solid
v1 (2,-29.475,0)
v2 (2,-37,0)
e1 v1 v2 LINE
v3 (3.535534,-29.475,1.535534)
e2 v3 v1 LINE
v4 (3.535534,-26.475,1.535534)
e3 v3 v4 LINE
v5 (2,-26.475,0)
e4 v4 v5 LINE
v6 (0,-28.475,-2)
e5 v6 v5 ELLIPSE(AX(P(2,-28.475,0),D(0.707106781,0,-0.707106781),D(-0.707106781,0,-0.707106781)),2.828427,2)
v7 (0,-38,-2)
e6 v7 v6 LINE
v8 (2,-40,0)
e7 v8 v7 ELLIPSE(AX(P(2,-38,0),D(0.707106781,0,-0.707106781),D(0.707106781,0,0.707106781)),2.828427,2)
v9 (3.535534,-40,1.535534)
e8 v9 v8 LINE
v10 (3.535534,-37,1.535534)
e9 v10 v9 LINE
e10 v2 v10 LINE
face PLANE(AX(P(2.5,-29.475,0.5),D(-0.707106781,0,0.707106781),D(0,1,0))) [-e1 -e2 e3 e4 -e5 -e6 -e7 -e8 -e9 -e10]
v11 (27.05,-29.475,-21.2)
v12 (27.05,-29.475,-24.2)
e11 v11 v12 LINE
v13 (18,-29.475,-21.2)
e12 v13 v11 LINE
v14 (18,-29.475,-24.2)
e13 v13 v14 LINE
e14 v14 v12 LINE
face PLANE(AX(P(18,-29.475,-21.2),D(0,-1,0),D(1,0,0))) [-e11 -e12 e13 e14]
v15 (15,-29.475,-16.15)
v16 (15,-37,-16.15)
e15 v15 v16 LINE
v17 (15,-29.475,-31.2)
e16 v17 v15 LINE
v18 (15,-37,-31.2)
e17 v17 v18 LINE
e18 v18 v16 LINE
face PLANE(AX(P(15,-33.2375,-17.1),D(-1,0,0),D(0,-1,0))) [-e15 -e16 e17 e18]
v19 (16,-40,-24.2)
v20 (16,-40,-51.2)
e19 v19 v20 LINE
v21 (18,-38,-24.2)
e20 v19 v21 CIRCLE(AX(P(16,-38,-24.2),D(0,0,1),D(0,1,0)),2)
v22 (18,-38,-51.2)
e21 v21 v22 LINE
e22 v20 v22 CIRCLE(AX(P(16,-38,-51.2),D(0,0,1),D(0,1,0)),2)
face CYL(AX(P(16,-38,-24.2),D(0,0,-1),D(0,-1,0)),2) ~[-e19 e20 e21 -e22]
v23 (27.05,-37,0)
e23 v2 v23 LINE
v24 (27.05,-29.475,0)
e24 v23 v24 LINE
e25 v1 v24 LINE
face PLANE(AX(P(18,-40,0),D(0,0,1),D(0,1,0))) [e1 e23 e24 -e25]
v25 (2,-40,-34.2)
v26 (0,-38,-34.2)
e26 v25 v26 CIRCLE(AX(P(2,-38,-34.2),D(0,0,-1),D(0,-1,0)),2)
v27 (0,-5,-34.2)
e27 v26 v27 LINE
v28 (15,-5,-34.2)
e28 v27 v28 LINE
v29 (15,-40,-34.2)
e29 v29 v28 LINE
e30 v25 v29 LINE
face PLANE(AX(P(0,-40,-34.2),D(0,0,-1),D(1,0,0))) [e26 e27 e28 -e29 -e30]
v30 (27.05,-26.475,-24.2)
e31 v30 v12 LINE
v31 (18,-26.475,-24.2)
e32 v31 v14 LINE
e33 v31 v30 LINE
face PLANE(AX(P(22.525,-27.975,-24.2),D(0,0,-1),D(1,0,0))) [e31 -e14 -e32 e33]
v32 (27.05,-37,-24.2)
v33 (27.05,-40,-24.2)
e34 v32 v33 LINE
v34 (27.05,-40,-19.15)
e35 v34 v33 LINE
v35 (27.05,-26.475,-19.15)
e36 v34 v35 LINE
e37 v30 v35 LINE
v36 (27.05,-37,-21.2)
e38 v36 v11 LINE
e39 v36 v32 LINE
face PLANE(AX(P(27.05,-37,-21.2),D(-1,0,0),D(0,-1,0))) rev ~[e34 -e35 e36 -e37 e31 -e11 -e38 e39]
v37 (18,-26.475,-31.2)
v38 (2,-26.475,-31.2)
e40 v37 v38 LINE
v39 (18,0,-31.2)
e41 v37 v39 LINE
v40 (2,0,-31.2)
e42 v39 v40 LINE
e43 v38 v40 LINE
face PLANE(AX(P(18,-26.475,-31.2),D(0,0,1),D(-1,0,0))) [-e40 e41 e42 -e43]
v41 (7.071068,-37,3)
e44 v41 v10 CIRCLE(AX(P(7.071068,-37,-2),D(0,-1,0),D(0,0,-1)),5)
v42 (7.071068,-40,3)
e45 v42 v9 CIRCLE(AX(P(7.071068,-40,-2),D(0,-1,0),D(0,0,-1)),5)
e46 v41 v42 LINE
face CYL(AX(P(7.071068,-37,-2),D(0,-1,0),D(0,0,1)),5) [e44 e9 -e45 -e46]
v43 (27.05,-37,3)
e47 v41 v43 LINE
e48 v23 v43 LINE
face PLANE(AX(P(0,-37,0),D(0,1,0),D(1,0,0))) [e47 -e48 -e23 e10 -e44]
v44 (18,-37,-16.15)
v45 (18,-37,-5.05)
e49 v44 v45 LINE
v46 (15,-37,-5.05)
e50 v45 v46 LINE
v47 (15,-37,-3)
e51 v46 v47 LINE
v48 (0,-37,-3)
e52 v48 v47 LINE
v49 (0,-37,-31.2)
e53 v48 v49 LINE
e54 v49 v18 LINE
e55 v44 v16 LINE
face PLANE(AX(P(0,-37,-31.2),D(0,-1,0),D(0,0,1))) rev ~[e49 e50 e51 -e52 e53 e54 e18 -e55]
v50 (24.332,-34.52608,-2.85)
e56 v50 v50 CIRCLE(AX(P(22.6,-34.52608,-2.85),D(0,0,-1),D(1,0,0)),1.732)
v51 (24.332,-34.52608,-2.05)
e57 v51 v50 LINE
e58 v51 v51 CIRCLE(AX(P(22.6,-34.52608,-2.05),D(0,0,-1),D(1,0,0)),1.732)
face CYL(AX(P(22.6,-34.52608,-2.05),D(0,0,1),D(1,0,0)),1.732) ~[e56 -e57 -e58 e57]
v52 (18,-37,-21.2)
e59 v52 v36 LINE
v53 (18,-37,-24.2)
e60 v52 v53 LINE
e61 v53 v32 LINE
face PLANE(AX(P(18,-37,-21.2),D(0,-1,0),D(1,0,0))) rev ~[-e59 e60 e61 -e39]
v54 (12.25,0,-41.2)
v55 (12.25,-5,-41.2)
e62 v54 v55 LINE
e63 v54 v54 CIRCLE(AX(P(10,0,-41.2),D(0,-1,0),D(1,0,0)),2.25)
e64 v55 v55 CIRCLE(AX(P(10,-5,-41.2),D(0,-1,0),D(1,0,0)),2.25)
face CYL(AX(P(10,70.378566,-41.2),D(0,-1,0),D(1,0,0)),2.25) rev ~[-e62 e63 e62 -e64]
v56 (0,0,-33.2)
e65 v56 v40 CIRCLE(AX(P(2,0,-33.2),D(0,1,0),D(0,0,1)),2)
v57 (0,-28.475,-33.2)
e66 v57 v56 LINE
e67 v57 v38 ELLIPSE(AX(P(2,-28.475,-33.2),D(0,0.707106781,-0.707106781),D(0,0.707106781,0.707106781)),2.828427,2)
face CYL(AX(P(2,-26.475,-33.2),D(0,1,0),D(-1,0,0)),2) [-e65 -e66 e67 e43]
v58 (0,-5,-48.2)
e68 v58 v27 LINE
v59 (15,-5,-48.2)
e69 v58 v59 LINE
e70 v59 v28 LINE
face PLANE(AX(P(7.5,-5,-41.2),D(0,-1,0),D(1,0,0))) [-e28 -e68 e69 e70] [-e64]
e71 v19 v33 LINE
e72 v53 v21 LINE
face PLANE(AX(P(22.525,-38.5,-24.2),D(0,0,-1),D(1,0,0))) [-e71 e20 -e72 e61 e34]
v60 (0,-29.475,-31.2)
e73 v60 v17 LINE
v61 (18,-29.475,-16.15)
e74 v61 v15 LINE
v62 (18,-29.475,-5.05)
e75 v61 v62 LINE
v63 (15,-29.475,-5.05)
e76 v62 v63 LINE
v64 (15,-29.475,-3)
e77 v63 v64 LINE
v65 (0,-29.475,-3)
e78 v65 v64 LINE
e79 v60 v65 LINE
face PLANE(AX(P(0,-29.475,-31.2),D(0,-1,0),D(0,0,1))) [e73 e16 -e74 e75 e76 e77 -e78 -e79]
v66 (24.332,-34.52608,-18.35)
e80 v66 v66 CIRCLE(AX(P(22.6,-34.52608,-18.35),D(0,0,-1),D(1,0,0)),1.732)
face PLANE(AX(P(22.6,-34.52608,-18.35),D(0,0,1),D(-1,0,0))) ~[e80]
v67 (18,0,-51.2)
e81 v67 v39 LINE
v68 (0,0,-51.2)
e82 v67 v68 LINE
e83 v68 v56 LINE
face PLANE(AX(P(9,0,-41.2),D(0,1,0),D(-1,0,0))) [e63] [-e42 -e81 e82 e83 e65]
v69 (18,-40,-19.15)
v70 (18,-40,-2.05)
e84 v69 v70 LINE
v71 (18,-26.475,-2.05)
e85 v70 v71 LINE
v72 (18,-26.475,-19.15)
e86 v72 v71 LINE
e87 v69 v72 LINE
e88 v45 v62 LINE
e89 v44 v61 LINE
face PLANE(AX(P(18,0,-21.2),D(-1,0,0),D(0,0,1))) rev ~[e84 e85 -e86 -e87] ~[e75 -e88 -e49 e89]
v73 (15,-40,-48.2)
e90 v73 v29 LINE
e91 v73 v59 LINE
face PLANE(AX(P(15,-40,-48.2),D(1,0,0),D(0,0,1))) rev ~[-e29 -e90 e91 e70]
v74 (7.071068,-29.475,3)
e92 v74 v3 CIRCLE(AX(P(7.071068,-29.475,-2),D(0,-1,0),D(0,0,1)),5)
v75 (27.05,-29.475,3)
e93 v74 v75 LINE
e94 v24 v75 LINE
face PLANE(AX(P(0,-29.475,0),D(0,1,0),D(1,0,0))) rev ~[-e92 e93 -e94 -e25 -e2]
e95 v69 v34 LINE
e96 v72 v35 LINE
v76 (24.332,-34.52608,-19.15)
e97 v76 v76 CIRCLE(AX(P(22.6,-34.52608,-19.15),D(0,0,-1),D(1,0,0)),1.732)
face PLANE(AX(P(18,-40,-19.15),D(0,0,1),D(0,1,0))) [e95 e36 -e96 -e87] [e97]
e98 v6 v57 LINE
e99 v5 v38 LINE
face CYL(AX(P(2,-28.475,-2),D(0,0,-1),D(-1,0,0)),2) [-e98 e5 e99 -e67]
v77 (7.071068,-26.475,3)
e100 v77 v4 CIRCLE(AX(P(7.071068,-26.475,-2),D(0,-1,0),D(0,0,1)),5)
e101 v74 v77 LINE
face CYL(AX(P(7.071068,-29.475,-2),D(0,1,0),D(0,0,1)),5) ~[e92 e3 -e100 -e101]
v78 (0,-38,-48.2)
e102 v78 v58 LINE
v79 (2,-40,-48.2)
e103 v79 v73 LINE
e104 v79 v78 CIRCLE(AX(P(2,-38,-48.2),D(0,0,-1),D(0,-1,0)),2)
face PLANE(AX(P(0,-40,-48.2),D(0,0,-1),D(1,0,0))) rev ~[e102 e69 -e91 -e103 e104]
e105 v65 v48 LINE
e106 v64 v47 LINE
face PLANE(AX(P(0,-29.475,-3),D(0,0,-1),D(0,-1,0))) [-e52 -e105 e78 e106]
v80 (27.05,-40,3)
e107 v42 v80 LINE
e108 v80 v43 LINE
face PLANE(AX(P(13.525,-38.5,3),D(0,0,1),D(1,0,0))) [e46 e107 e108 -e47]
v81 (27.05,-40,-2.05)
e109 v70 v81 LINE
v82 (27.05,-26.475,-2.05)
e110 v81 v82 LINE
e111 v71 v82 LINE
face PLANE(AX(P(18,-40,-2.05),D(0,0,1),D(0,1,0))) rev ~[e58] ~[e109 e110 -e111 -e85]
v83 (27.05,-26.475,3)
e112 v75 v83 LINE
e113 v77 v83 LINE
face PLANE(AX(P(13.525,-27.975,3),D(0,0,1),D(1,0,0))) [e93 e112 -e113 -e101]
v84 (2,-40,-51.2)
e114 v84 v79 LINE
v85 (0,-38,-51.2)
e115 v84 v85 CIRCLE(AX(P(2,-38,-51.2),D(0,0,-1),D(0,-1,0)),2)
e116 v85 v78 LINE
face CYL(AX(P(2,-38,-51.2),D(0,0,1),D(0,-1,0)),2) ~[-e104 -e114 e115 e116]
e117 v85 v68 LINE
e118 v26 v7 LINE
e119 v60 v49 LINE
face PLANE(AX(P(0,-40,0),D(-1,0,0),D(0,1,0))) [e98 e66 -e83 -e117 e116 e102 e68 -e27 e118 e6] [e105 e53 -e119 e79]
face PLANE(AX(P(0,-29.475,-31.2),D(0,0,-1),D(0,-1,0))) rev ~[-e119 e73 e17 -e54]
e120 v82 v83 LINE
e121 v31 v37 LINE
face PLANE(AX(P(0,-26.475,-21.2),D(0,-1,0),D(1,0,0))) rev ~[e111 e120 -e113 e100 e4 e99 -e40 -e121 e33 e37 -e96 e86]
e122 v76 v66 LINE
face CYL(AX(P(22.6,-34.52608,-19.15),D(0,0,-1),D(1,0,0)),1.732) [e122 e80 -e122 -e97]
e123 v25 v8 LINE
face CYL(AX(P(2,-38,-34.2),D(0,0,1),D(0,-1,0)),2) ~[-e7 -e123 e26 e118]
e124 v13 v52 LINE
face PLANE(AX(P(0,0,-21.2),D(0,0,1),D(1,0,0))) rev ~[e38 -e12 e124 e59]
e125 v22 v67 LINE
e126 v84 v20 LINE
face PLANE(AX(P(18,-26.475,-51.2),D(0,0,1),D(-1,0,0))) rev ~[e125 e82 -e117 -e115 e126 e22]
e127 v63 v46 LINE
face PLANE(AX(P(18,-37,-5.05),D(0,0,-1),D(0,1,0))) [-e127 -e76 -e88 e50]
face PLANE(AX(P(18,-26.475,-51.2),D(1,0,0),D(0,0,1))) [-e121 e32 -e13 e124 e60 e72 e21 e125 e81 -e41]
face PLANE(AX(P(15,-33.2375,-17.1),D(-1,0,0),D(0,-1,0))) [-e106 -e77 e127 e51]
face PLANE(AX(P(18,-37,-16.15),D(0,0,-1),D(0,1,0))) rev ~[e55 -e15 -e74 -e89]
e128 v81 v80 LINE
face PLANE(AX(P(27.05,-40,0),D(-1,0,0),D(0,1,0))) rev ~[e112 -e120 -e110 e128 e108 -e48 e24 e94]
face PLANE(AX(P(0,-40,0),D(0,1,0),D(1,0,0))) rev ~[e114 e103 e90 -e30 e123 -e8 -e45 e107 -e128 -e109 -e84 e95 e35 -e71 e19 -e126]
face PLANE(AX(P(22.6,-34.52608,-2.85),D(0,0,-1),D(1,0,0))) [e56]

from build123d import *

# Parameters (mm, degrees)
F0_W      = 18
F0_H      = 21.2
F1_DEPTH  = 40
F2_W      = 13.525
F2_H      = 2.05
F3_DEPTH  = 9.05
F4_R      = 1.732
F5_DEPTH  = 0.8
F7_W      = 18
F7_H      = 13.525
F8_DEPTH  = 30
F9_W      = 18
F9_H      = 20
F10_DEPTH = 26.475
F11_W     = 18
F11_H     = 26.475
F12_DEPTH = 21.2
F13_W     = 15
F13_H     = 14
F14_DEPTH = 35
F16_D     = 4.5
F17_W     = 7.525
F17_H     = 28.2
F18_DEPTH = 15
F19_W     = 7.525
F19_H     = 11.1
F20_DEPTH = 18.001
F21_W     = 27.05
F21_H     = 3
F22_DEPTH = 3
F23_W     = 9.05
F23_H     = 3
F24_DEPTH = 3
F25_SIZE  = 5
F26_R     = 2
F27_R     = 5


# Not quite as in the source:
# - a pattern or mirror of a feature is missing from the dataset's text; its kind, count and spacing are read off the source's solid


with BuildPart() as f1:
    # F0 (on Front) → F1 (new body)
    with BuildSketch(Plane.XZ):
        with Locations((9, -10.6)):
            Rectangle(F0_W, F0_H)
    extrude(amount=F1_DEPTH)

    # F2 (on face) → F3 (join)
    with BuildSketch(Plane.YZ.offset(18)):
        with Locations((-33.2375, -1.025)):
            Rectangle(F2_W, F2_H)
        with Locations((-33.2375, -20.175)):
            Rectangle(F2_W, F2_H)
    extrude(amount=F3_DEPTH)

    # F4 (on face) → F5 (join)
    with BuildSketch(Plane(origin=(0, 0, -2.05), x_dir=(1, 0, 0), z_dir=(0, 0, -1))):
        with Locations((22.6, 34.5260798931)):
            Circle(F4_R)
    f5 = extrude(amount=F5_DEPTH)

    # F5_copies: F5 across plane
    add(f5.mirror(Plane(origin=(0, 0, -10.6), x_dir=(-1, 0, 0), z_dir=(0, 0, -1))))

    # F7 (on face) → F8 (join)
    with BuildSketch(Plane(origin=(0, 0, -21.2), x_dir=(1, 0, 0), z_dir=(0, 0, -1))):
        with Locations((9, 33.2375)):
            Rectangle(F7_W, F7_H)
    extrude(amount=F8_DEPTH)

    # F9 (on face) → F10 (join, through all)
    with BuildSketch(Plane(origin=(0, -26.475, 0), x_dir=(-1, 0, 0), z_dir=(0, 1, 0))):
        with Locations((-9, -41.2)):
            Rectangle(F9_W, F9_H)
    extrude(amount=F10_DEPTH)

    # F11 (on face) → F12 (cut, through all)
    with BuildSketch(Plane(origin=(0, 0, -21.2), x_dir=(1, 0, 0), z_dir=(0, 0, -1))):
        with Locations((9, 13.2375)):
            Rectangle(F11_W, F11_H)
    extrude(amount=-F12_DEPTH, mode=Mode.SUBTRACT)

    # F13 (on face) → F14 (cut)
    with BuildSketch(Plane.XZ.offset(40)):
        with Locations((7.5, -41.2)):
            Rectangle(F13_W, F13_H)
    extrude(amount=-F14_DEPTH, mode=Mode.SUBTRACT)

    # F16 (through all)
    with Locations(Plane(origin=(0, 0, 0), x_dir=(-1, 0, 0), z_dir=(0, 1, 0))):
        with Locations((-10, -41.2)):
            Hole(F16_D / 2)

    # F17 (on face) → F18 (cut)
    with BuildSketch(Plane(origin=(0, 0, 0), x_dir=(0, -1, 0), z_dir=(-1, 0, 0))):
        with Locations((33.2375, -17.1)):
            Rectangle(F17_W, F17_H)
    extrude(amount=-F18_DEPTH, mode=Mode.SUBTRACT)

    # F19 (on face) → F20 (cut, through all)
    with BuildSketch(Plane.YZ.offset(18)):
        with Locations((-33.2375, -10.6)):
            Rectangle(F19_W, F19_H)
    extrude(amount=-F20_DEPTH, mode=Mode.SUBTRACT)

    # F21 (on face) → F22 (join)
    with BuildSketch(Plane.XY):
        with Locations((13.525, -38.5)):
            Rectangle(F21_W, F21_H)
        with Locations((13.525, -27.975)):
            Rectangle(F21_W, F21_H)
    extrude(amount=F22_DEPTH)

    # F23 (on face) → F24 (join)
    with BuildSketch(Plane(origin=(0, 0, -21.2), x_dir=(1, 0, 0), z_dir=(0, 0, -1))):
        with Locations((22.525, 38.5)):
            Rectangle(F23_W, F23_H)
        with Locations((22.525, 27.975)):
            Rectangle(F23_W, F23_H)
    extrude(amount=F24_DEPTH)

    # F25
    f25_edges = [f1.edges().sort_by_distance(p)[0] for p in [
        (0, -27.975, 3),
    ]]
    chamfer(f25_edges, length=F25_SIZE)

    # F26
    f26_edges = [f1.edges().sort_by_distance(p)[0] for p in [
        (0, -40, -49.7),
        (0, -40, -18.1),
        (0, -13.2375, -31.2),
        (18, -40, -37.7),
        (0, -26.475, -16.6),
    ]]
    fillet(f26_edges, radius=F26_R)

    # F27
    f27_edges = [f1.edges().sort_by_distance(p)[0] for p in [
        (5, -38.5, 3),
        (5, -27.975, 3),
    ]]
    fillet(f27_edges, radius=F27_R)


solid = f1.part
